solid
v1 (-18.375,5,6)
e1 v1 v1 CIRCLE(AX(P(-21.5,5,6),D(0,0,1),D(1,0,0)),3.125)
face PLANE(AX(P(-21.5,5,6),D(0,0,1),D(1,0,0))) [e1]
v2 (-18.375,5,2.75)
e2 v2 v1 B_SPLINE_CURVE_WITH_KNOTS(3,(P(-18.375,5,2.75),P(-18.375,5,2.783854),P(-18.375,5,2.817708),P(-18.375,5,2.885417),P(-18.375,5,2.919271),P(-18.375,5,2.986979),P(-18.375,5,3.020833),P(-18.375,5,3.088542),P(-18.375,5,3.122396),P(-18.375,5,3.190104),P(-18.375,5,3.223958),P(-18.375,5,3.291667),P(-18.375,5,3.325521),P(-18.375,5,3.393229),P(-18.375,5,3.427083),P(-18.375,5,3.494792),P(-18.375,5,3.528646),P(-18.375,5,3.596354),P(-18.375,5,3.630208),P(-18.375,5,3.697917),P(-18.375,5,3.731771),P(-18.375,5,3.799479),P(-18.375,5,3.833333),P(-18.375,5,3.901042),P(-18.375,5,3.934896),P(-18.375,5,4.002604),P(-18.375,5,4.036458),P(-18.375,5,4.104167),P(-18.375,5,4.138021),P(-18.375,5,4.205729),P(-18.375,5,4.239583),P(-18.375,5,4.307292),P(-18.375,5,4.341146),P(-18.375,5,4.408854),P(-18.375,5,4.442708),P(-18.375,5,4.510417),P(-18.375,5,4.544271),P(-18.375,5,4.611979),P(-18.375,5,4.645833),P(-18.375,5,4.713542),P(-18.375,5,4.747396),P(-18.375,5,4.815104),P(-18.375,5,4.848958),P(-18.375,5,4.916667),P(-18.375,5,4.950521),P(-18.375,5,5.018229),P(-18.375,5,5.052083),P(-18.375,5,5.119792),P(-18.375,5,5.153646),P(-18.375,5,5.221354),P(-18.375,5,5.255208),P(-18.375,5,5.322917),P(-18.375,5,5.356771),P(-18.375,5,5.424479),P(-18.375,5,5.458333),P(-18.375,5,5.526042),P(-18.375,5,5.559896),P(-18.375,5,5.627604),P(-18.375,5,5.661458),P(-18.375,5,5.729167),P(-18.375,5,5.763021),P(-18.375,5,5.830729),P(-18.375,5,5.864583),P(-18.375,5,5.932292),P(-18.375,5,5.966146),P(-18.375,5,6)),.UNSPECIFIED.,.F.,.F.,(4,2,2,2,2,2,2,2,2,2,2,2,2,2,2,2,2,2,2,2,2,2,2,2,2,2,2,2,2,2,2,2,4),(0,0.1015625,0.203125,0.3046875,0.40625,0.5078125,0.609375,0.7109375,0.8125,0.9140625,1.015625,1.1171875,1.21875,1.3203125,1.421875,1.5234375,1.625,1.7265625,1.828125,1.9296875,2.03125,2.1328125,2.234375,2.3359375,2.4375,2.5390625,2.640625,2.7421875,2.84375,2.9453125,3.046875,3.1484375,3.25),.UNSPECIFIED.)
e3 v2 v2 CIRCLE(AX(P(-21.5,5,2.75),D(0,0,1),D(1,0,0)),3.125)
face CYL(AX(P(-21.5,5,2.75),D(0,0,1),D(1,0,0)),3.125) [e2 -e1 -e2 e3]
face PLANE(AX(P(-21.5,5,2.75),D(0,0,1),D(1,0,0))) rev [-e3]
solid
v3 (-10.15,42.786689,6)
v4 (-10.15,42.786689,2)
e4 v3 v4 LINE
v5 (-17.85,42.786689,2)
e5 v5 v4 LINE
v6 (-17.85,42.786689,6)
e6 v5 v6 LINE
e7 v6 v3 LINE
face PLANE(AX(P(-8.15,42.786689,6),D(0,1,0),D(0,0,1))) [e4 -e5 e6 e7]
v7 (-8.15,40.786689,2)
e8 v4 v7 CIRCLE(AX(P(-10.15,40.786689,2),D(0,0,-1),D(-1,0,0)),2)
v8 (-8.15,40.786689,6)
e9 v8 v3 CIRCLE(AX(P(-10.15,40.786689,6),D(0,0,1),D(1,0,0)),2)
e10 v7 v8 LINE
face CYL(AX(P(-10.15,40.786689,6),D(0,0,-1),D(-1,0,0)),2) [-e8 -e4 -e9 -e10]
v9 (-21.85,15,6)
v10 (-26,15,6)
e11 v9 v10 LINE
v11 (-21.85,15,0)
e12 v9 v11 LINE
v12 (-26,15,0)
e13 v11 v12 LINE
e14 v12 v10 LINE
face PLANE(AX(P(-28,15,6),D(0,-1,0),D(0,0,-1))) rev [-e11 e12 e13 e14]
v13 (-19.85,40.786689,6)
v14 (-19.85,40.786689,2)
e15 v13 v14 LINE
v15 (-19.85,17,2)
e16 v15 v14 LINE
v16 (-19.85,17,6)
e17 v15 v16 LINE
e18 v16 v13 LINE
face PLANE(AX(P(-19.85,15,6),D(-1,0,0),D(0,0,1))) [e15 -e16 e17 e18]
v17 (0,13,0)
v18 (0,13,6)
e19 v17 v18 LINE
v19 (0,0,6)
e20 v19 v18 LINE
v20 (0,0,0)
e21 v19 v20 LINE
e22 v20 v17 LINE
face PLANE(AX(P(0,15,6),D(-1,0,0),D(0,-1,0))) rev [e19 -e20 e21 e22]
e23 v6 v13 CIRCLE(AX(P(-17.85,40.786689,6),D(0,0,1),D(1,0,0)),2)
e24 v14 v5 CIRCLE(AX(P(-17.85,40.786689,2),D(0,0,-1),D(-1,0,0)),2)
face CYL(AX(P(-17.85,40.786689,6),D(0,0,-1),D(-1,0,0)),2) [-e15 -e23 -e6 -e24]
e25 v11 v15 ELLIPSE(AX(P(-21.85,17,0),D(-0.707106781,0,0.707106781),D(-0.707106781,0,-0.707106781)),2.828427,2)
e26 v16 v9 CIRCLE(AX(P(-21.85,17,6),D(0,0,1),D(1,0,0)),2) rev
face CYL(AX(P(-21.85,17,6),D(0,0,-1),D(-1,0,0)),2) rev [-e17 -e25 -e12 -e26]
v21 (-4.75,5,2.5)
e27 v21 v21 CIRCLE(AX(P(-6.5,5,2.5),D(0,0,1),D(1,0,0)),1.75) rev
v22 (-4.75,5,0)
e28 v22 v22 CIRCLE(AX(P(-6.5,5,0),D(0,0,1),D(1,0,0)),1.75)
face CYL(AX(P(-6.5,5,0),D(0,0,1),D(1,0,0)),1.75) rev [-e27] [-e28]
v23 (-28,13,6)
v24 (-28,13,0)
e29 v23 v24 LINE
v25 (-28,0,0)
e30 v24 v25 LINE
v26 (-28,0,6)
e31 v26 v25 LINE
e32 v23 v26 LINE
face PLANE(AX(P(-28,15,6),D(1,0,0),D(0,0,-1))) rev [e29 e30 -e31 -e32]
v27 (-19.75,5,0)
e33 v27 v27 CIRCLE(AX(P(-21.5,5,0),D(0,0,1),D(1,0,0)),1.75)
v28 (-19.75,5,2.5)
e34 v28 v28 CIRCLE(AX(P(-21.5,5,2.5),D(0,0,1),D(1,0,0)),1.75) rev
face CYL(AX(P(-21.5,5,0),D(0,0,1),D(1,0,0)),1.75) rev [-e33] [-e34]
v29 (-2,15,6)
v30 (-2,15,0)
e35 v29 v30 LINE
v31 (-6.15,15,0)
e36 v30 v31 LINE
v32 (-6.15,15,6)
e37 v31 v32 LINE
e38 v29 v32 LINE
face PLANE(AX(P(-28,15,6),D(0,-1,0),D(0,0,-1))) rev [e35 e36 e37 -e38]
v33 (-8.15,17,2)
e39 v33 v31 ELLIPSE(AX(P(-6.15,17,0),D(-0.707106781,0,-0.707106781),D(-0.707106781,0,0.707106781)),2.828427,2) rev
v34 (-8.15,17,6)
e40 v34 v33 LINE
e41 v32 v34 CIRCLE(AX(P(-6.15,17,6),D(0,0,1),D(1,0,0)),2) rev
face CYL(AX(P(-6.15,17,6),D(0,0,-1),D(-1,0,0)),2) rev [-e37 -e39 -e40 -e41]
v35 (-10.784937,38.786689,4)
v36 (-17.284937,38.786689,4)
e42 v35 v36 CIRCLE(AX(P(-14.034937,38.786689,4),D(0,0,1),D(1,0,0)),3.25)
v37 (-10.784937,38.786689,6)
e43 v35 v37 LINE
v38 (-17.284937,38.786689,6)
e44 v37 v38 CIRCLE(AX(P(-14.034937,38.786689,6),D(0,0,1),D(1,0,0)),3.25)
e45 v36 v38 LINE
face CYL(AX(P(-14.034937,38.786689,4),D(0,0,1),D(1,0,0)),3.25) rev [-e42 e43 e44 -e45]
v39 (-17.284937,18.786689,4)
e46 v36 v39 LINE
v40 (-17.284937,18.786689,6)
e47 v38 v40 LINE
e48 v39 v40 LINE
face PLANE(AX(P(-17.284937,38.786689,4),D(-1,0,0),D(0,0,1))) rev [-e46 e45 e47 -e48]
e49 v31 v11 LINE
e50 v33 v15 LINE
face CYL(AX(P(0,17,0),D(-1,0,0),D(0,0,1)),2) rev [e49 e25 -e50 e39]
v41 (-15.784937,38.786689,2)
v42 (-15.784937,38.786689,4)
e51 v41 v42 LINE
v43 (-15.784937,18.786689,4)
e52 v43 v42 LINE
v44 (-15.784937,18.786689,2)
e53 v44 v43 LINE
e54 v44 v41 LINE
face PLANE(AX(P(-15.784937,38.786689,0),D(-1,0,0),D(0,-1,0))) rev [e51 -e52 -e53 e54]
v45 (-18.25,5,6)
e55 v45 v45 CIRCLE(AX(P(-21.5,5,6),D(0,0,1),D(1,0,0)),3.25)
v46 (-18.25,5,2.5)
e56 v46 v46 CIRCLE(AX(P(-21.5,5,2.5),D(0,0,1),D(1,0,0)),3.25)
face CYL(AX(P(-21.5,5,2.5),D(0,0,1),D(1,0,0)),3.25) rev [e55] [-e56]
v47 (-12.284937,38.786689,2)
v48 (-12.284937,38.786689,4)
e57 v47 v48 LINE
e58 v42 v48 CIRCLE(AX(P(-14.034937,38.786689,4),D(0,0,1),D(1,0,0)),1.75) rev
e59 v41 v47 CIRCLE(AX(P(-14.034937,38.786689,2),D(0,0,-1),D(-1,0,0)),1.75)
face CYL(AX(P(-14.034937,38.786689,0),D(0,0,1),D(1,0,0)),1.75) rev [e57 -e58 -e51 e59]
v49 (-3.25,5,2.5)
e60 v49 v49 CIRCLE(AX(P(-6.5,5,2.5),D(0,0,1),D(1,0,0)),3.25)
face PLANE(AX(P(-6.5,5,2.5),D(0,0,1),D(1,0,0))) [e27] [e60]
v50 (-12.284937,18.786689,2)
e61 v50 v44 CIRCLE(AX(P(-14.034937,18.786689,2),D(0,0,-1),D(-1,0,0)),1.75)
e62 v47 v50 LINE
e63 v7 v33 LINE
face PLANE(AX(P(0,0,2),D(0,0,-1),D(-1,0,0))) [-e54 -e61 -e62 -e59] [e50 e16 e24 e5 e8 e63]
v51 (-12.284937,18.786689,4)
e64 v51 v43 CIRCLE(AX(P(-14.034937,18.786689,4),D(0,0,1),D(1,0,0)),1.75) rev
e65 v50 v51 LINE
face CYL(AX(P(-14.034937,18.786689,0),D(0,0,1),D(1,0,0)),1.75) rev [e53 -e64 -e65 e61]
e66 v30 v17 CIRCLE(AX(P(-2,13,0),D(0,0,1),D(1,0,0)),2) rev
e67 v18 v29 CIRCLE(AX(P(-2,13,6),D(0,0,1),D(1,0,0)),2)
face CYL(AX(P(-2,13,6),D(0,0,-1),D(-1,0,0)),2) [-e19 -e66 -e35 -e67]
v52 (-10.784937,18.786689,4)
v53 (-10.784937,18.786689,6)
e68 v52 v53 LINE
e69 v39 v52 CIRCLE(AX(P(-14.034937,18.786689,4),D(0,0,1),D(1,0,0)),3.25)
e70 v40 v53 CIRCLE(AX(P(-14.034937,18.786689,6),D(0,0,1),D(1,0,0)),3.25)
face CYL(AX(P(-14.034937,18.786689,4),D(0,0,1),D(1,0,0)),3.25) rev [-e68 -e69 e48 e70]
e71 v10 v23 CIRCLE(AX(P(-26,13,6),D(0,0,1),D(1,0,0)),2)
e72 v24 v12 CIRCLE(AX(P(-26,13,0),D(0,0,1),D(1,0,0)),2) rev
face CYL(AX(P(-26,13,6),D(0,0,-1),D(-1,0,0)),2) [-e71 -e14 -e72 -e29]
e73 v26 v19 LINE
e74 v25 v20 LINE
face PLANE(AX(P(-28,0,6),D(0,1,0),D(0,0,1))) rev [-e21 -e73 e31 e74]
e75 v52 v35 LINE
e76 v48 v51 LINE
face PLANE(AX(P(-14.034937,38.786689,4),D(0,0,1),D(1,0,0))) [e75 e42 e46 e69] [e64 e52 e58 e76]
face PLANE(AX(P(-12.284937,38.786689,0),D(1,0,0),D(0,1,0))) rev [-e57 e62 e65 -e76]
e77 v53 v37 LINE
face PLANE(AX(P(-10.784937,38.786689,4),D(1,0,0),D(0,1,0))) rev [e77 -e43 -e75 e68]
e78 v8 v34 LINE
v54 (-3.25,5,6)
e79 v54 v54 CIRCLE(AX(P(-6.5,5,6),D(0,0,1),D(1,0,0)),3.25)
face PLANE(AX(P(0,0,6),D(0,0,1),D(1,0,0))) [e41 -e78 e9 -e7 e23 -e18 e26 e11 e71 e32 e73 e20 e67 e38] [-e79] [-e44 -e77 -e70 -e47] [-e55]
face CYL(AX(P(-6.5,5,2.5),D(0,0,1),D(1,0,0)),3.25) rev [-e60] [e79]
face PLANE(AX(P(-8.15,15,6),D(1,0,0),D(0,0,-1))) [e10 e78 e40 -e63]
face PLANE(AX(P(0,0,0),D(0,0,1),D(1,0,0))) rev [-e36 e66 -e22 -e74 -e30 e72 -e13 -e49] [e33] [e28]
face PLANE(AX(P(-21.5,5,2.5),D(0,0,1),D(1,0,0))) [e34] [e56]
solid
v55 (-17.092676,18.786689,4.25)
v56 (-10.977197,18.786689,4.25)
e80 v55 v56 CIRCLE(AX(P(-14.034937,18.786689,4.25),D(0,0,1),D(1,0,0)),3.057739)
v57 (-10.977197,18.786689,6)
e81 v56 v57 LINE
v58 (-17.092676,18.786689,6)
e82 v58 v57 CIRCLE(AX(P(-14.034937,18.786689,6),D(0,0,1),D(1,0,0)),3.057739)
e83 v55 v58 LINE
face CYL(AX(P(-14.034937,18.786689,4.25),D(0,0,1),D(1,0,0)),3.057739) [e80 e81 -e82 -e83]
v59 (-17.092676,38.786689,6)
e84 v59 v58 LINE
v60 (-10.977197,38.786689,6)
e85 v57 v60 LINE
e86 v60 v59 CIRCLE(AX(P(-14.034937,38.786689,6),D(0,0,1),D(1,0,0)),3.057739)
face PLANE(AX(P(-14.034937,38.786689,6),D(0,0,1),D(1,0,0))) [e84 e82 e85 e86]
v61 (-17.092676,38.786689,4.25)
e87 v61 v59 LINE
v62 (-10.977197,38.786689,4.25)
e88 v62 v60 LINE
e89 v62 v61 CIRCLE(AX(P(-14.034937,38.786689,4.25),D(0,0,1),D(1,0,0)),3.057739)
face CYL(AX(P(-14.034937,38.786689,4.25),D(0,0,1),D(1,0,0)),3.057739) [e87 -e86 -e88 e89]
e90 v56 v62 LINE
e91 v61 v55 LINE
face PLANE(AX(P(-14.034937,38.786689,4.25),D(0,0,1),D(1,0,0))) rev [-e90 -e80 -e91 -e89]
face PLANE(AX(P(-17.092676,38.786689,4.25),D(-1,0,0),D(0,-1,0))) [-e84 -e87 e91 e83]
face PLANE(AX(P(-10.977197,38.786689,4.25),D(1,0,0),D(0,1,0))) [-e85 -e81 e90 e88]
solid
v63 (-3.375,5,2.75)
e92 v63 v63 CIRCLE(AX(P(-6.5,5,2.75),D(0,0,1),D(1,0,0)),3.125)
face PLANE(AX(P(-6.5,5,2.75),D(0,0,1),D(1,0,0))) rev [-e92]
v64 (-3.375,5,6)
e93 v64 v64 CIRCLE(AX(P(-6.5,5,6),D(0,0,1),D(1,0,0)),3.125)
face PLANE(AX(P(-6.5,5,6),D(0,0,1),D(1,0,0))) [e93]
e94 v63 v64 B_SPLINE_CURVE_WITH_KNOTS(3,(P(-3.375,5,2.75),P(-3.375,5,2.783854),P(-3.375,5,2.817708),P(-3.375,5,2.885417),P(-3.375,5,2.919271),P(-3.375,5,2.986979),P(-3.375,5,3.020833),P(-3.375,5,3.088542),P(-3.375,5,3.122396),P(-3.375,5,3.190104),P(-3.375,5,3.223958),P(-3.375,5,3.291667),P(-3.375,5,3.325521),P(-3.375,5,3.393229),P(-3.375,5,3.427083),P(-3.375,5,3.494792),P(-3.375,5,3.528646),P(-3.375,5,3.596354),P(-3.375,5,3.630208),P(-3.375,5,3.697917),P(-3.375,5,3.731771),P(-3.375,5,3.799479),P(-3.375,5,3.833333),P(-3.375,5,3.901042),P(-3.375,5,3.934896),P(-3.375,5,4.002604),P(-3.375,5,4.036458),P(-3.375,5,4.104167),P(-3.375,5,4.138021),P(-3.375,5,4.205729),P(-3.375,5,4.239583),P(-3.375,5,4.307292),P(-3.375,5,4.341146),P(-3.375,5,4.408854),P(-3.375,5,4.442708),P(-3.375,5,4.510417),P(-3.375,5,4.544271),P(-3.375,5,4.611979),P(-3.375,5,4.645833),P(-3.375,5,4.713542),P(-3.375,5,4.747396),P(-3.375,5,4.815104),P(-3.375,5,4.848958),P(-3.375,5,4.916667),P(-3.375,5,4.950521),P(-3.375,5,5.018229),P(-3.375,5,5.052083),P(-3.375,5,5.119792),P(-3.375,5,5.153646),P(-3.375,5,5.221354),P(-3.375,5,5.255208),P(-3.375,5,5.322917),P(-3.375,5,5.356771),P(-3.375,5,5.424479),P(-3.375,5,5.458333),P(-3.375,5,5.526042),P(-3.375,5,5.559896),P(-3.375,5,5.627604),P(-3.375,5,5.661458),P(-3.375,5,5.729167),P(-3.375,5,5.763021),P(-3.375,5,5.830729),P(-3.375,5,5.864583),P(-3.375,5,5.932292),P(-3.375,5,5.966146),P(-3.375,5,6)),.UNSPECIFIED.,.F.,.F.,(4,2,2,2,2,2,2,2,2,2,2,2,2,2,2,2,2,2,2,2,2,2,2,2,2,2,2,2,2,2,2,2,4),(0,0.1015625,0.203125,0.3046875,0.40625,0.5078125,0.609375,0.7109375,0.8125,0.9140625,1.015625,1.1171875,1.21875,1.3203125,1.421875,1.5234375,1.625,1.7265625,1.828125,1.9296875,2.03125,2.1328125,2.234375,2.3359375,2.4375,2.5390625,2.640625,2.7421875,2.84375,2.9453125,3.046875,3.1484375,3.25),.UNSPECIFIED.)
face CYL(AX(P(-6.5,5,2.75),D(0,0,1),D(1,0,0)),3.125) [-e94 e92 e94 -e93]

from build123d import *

# Parameters (mm, degrees)
BOSS_EXTRUDE1_DEPTH     = 6
CUT_EXTRUDE1_DEPTH      = 33.32645975048922
CUT_EXTRUDE1_DEPTH_BACK = 33.32645975048922
SKETCH3_R               = 1.7500000000000002
SKETCH3_R_2             = 1.7499999999999998
SKETCH6_R               = 3.2500000000000004
SKETCH6_R_2             = 3.25
CUT_EXTRUDE2_DEPTH      = 3.5
SKETCH7_W               = 11.699999999999998
SKETCH7_H               = 27.786688839798195
BOSS_EXTRUDE2_DEPTH     = 6
SKETCH8_W               = 11.699999999999998
SKETCH8_H               = 27.786688839798195
CUT_EXTRUDE3_DEPTH      = 2
FILLET1_R               = 2
FILLET2_R               = 2
FILLET3_R               = 2
CUT_EXTRUDE4_DEPTH      = 52.48495646180262
CUT_EXTRUDE4_DEPTH_BACK = 52.48495646180262
CUT_EXTRUDE5_DEPTH      = 52.48495646180262
CUT_EXTRUDE5_DEPTH_BACK = 2
FILLET4_R               = 2
FILLET5_R               = 2
SKETCH11_R              = 3.1250000000000004
BOSS_EXTRUDE3_DEPTH     = 3.25
SKETCH11_R_2            = 3.125
BOSS_EXTRUDE3_2_DEPTH   = 3.25
BOSS_EXTRUDE4_DEPTH     = 1.75


with BuildPart() as part:
    # Sketch2 → Boss-Extrude1 (new body)
    with BuildSketch(Plane.XY):
        Polygon((-27.999999999999996, 15), (1.84e-15, 15), (0, 0), (-27.999999999999996, 0), align=None)
    extrude(amount=BOSS_EXTRUDE1_DEPTH)

    # Sketch3 → Cut-Extrude1 (cut, two sides: drawn at the far end of the back side and taken through both)
    with BuildSketch(Plane.XY.offset(6).offset(-CUT_EXTRUDE1_DEPTH_BACK)):
        with Locations((-21.5, 4.999999999999999)):
            Circle(SKETCH3_R)
        with Locations((-6.5, 4.999999999999999)):
            Circle(SKETCH3_R_2)
    extrude(amount=CUT_EXTRUDE1_DEPTH + CUT_EXTRUDE1_DEPTH_BACK, mode=Mode.SUBTRACT)

    # Sketch6 → Cut-Extrude2 (cut)
    with BuildSketch(Plane.XY.offset(6)):
        with Locations((-21.5, 4.999999999999999)):
            Circle(SKETCH6_R)
        with Locations((-6.500000000000001, 4.999999999999999)):
            Circle(SKETCH6_R_2)
    extrude(amount=-CUT_EXTRUDE2_DEPTH, mode=Mode.SUBTRACT)

    # Sketch7 → Boss-Extrude2 (add)
    with BuildSketch(Plane(origin=(0, 0, 0), x_dir=(-1, 0, 0), z_dir=(0, 0, -1))):
        with Locations((14, 28.893344419899098)):
            Rectangle(SKETCH7_W, SKETCH7_H)
    extrude(amount=-BOSS_EXTRUDE2_DEPTH)

    # Sketch8 → Cut-Extrude3 (cut)
    with BuildSketch(Plane(origin=(0, 0, 0), x_dir=(-1, 0, 0), z_dir=(0, 0, -1))):
        with Locations((14, 28.893344419899098)):
            Rectangle(SKETCH8_W, SKETCH8_H)
    extrude(amount=-CUT_EXTRUDE3_DEPTH, mode=Mode.SUBTRACT)

    # Fillet1
    fillet1_edges = [part.edges().sort_by_distance(p)[0] for p in [
        (-14, 15, 2),
    ]]
    fillet(fillet1_edges, radius=FILLET1_R - 0.0001)  # a hair under: the kernel refuses the full size

    # Fillet2
    fillet2_edges = [part.edges().sort_by_distance(p)[0] for p in [
        (-8.15, 15, 3.0000500000000003),
    ]]
    fillet(fillet2_edges, radius=FILLET2_R)

    # Fillet3
    fillet3_edges = [part.edges().sort_by_distance(p)[0] for p in [
        (-19.849999999999998, 15, 3.00005),
    ]]
    fillet(fillet3_edges, radius=FILLET3_R)

    # Sketch9 → Cut-Extrude4 (cut, two sides: drawn at the far end of the back side and taken through both)
    with BuildSketch(Plane.XY.offset(6).offset(-CUT_EXTRUDE4_DEPTH_BACK)):
        with BuildLine():
            Line((-12.28493666219322, 38.78668883979819), (-12.284936662193216, 18.786688839798188))
            ThreePointArc((-12.284936662193216, 18.786688839798188), (-14.034936662193216, 17.036688839798188), (-15.784936662193216, 18.786688839798188))
            Line((-15.784936662193216, 18.786688839798188), (-15.78493666219322, 38.78668883979819))
            ThreePointArc((-15.78493666219322, 38.78668883979819), (-14.03493666219322, 40.53668883979819), (-12.28493666219322, 38.78668883979819))
        make_face()
    extrude(amount=CUT_EXTRUDE4_DEPTH + CUT_EXTRUDE4_DEPTH_BACK, mode=Mode.SUBTRACT)

    # Sketch10 → Cut-Extrude5 (cut, two sides: drawn at the far end of the back side and taken through both)
    with BuildSketch(Plane.XY.offset(6).offset(-CUT_EXTRUDE5_DEPTH_BACK)):
        with BuildLine():
            Line((-10.784936662193223, 38.78668883979819), (-10.78493666219322, 18.786688839798188))
            ThreePointArc((-10.78493666219322, 18.786688839798188), (-14.034936662193216, 15.536688839798186), (-17.284936662193218, 18.786688839798188))
            Line((-17.284936662193218, 18.786688839798188), (-17.284936662193218, 38.78668883979819))
            ThreePointArc((-17.284936662193218, 38.78668883979819), (-14.03493666219322, 42.03668883979819), (-10.784936662193223, 38.78668883979819))
        make_face()
    extrude(amount=CUT_EXTRUDE5_DEPTH + CUT_EXTRUDE5_DEPTH_BACK, mode=Mode.SUBTRACT)

    # Fillet4
    fillet4_edges = [part.edges().sort_by_distance(p)[0] for p in [
        (-8.15, 42.786688839798195, 4),
        (-19.849999999999998, 42.786688839798195, 4),
    ]]
    fillet(fillet4_edges, radius=FILLET4_R)

    # Fillet5
    fillet5_edges = [part.edges().sort_by_distance(p)[0] for p in [
        (-27.999999999999996, 15, 3),
        (1.84e-15, 15, 3),
    ]]
    fillet(fillet5_edges, radius=FILLET5_R)


with BuildPart() as body_2:
    # Sketch11 → Boss-Extrude3 (new body)
    with BuildSketch(Plane.XY.offset(6)):
        with Locations((-21.5, 4.999999999999999)):
            Circle(SKETCH11_R)
    extrude(amount=-BOSS_EXTRUDE3_DEPTH)


with BuildPart() as body_3:
    # Sketch11 → Boss-Extrude3 2 (new body)
    with BuildSketch(Plane.XY.offset(6)):
        with Locations((-6.5, 4.999999999999999)):
            Circle(SKETCH11_R_2)
    extrude(amount=-BOSS_EXTRUDE3_2_DEPTH)


with BuildPart() as body_4:
    # Sketch12 → Boss-Extrude4 (new body)
    with BuildSketch(Plane.XY.offset(6)):
        with BuildLine():
            Line((-10.977197352545545, 38.78668883979819), (-10.977197352545542, 18.786688839798185))
            ThreePointArc((-10.977197352545542, 18.786688839798185), (-14.034936662193216, 15.72894953015051), (-17.09267597184089, 18.786688839798185))
            Line((-17.09267597184089, 18.786688839798185), (-17.092675971840894, 38.78668883979819))
            ThreePointArc((-17.092675971840894, 38.78668883979819), (-14.03493666219322, 41.84442814944586), (-10.977197352545545, 38.78668883979819))
        make_face()
    extrude(amount=-BOSS_EXTRUDE4_DEPTH)


solid = Compound([part.part, body_2.part, body_3.part, body_4.part])
